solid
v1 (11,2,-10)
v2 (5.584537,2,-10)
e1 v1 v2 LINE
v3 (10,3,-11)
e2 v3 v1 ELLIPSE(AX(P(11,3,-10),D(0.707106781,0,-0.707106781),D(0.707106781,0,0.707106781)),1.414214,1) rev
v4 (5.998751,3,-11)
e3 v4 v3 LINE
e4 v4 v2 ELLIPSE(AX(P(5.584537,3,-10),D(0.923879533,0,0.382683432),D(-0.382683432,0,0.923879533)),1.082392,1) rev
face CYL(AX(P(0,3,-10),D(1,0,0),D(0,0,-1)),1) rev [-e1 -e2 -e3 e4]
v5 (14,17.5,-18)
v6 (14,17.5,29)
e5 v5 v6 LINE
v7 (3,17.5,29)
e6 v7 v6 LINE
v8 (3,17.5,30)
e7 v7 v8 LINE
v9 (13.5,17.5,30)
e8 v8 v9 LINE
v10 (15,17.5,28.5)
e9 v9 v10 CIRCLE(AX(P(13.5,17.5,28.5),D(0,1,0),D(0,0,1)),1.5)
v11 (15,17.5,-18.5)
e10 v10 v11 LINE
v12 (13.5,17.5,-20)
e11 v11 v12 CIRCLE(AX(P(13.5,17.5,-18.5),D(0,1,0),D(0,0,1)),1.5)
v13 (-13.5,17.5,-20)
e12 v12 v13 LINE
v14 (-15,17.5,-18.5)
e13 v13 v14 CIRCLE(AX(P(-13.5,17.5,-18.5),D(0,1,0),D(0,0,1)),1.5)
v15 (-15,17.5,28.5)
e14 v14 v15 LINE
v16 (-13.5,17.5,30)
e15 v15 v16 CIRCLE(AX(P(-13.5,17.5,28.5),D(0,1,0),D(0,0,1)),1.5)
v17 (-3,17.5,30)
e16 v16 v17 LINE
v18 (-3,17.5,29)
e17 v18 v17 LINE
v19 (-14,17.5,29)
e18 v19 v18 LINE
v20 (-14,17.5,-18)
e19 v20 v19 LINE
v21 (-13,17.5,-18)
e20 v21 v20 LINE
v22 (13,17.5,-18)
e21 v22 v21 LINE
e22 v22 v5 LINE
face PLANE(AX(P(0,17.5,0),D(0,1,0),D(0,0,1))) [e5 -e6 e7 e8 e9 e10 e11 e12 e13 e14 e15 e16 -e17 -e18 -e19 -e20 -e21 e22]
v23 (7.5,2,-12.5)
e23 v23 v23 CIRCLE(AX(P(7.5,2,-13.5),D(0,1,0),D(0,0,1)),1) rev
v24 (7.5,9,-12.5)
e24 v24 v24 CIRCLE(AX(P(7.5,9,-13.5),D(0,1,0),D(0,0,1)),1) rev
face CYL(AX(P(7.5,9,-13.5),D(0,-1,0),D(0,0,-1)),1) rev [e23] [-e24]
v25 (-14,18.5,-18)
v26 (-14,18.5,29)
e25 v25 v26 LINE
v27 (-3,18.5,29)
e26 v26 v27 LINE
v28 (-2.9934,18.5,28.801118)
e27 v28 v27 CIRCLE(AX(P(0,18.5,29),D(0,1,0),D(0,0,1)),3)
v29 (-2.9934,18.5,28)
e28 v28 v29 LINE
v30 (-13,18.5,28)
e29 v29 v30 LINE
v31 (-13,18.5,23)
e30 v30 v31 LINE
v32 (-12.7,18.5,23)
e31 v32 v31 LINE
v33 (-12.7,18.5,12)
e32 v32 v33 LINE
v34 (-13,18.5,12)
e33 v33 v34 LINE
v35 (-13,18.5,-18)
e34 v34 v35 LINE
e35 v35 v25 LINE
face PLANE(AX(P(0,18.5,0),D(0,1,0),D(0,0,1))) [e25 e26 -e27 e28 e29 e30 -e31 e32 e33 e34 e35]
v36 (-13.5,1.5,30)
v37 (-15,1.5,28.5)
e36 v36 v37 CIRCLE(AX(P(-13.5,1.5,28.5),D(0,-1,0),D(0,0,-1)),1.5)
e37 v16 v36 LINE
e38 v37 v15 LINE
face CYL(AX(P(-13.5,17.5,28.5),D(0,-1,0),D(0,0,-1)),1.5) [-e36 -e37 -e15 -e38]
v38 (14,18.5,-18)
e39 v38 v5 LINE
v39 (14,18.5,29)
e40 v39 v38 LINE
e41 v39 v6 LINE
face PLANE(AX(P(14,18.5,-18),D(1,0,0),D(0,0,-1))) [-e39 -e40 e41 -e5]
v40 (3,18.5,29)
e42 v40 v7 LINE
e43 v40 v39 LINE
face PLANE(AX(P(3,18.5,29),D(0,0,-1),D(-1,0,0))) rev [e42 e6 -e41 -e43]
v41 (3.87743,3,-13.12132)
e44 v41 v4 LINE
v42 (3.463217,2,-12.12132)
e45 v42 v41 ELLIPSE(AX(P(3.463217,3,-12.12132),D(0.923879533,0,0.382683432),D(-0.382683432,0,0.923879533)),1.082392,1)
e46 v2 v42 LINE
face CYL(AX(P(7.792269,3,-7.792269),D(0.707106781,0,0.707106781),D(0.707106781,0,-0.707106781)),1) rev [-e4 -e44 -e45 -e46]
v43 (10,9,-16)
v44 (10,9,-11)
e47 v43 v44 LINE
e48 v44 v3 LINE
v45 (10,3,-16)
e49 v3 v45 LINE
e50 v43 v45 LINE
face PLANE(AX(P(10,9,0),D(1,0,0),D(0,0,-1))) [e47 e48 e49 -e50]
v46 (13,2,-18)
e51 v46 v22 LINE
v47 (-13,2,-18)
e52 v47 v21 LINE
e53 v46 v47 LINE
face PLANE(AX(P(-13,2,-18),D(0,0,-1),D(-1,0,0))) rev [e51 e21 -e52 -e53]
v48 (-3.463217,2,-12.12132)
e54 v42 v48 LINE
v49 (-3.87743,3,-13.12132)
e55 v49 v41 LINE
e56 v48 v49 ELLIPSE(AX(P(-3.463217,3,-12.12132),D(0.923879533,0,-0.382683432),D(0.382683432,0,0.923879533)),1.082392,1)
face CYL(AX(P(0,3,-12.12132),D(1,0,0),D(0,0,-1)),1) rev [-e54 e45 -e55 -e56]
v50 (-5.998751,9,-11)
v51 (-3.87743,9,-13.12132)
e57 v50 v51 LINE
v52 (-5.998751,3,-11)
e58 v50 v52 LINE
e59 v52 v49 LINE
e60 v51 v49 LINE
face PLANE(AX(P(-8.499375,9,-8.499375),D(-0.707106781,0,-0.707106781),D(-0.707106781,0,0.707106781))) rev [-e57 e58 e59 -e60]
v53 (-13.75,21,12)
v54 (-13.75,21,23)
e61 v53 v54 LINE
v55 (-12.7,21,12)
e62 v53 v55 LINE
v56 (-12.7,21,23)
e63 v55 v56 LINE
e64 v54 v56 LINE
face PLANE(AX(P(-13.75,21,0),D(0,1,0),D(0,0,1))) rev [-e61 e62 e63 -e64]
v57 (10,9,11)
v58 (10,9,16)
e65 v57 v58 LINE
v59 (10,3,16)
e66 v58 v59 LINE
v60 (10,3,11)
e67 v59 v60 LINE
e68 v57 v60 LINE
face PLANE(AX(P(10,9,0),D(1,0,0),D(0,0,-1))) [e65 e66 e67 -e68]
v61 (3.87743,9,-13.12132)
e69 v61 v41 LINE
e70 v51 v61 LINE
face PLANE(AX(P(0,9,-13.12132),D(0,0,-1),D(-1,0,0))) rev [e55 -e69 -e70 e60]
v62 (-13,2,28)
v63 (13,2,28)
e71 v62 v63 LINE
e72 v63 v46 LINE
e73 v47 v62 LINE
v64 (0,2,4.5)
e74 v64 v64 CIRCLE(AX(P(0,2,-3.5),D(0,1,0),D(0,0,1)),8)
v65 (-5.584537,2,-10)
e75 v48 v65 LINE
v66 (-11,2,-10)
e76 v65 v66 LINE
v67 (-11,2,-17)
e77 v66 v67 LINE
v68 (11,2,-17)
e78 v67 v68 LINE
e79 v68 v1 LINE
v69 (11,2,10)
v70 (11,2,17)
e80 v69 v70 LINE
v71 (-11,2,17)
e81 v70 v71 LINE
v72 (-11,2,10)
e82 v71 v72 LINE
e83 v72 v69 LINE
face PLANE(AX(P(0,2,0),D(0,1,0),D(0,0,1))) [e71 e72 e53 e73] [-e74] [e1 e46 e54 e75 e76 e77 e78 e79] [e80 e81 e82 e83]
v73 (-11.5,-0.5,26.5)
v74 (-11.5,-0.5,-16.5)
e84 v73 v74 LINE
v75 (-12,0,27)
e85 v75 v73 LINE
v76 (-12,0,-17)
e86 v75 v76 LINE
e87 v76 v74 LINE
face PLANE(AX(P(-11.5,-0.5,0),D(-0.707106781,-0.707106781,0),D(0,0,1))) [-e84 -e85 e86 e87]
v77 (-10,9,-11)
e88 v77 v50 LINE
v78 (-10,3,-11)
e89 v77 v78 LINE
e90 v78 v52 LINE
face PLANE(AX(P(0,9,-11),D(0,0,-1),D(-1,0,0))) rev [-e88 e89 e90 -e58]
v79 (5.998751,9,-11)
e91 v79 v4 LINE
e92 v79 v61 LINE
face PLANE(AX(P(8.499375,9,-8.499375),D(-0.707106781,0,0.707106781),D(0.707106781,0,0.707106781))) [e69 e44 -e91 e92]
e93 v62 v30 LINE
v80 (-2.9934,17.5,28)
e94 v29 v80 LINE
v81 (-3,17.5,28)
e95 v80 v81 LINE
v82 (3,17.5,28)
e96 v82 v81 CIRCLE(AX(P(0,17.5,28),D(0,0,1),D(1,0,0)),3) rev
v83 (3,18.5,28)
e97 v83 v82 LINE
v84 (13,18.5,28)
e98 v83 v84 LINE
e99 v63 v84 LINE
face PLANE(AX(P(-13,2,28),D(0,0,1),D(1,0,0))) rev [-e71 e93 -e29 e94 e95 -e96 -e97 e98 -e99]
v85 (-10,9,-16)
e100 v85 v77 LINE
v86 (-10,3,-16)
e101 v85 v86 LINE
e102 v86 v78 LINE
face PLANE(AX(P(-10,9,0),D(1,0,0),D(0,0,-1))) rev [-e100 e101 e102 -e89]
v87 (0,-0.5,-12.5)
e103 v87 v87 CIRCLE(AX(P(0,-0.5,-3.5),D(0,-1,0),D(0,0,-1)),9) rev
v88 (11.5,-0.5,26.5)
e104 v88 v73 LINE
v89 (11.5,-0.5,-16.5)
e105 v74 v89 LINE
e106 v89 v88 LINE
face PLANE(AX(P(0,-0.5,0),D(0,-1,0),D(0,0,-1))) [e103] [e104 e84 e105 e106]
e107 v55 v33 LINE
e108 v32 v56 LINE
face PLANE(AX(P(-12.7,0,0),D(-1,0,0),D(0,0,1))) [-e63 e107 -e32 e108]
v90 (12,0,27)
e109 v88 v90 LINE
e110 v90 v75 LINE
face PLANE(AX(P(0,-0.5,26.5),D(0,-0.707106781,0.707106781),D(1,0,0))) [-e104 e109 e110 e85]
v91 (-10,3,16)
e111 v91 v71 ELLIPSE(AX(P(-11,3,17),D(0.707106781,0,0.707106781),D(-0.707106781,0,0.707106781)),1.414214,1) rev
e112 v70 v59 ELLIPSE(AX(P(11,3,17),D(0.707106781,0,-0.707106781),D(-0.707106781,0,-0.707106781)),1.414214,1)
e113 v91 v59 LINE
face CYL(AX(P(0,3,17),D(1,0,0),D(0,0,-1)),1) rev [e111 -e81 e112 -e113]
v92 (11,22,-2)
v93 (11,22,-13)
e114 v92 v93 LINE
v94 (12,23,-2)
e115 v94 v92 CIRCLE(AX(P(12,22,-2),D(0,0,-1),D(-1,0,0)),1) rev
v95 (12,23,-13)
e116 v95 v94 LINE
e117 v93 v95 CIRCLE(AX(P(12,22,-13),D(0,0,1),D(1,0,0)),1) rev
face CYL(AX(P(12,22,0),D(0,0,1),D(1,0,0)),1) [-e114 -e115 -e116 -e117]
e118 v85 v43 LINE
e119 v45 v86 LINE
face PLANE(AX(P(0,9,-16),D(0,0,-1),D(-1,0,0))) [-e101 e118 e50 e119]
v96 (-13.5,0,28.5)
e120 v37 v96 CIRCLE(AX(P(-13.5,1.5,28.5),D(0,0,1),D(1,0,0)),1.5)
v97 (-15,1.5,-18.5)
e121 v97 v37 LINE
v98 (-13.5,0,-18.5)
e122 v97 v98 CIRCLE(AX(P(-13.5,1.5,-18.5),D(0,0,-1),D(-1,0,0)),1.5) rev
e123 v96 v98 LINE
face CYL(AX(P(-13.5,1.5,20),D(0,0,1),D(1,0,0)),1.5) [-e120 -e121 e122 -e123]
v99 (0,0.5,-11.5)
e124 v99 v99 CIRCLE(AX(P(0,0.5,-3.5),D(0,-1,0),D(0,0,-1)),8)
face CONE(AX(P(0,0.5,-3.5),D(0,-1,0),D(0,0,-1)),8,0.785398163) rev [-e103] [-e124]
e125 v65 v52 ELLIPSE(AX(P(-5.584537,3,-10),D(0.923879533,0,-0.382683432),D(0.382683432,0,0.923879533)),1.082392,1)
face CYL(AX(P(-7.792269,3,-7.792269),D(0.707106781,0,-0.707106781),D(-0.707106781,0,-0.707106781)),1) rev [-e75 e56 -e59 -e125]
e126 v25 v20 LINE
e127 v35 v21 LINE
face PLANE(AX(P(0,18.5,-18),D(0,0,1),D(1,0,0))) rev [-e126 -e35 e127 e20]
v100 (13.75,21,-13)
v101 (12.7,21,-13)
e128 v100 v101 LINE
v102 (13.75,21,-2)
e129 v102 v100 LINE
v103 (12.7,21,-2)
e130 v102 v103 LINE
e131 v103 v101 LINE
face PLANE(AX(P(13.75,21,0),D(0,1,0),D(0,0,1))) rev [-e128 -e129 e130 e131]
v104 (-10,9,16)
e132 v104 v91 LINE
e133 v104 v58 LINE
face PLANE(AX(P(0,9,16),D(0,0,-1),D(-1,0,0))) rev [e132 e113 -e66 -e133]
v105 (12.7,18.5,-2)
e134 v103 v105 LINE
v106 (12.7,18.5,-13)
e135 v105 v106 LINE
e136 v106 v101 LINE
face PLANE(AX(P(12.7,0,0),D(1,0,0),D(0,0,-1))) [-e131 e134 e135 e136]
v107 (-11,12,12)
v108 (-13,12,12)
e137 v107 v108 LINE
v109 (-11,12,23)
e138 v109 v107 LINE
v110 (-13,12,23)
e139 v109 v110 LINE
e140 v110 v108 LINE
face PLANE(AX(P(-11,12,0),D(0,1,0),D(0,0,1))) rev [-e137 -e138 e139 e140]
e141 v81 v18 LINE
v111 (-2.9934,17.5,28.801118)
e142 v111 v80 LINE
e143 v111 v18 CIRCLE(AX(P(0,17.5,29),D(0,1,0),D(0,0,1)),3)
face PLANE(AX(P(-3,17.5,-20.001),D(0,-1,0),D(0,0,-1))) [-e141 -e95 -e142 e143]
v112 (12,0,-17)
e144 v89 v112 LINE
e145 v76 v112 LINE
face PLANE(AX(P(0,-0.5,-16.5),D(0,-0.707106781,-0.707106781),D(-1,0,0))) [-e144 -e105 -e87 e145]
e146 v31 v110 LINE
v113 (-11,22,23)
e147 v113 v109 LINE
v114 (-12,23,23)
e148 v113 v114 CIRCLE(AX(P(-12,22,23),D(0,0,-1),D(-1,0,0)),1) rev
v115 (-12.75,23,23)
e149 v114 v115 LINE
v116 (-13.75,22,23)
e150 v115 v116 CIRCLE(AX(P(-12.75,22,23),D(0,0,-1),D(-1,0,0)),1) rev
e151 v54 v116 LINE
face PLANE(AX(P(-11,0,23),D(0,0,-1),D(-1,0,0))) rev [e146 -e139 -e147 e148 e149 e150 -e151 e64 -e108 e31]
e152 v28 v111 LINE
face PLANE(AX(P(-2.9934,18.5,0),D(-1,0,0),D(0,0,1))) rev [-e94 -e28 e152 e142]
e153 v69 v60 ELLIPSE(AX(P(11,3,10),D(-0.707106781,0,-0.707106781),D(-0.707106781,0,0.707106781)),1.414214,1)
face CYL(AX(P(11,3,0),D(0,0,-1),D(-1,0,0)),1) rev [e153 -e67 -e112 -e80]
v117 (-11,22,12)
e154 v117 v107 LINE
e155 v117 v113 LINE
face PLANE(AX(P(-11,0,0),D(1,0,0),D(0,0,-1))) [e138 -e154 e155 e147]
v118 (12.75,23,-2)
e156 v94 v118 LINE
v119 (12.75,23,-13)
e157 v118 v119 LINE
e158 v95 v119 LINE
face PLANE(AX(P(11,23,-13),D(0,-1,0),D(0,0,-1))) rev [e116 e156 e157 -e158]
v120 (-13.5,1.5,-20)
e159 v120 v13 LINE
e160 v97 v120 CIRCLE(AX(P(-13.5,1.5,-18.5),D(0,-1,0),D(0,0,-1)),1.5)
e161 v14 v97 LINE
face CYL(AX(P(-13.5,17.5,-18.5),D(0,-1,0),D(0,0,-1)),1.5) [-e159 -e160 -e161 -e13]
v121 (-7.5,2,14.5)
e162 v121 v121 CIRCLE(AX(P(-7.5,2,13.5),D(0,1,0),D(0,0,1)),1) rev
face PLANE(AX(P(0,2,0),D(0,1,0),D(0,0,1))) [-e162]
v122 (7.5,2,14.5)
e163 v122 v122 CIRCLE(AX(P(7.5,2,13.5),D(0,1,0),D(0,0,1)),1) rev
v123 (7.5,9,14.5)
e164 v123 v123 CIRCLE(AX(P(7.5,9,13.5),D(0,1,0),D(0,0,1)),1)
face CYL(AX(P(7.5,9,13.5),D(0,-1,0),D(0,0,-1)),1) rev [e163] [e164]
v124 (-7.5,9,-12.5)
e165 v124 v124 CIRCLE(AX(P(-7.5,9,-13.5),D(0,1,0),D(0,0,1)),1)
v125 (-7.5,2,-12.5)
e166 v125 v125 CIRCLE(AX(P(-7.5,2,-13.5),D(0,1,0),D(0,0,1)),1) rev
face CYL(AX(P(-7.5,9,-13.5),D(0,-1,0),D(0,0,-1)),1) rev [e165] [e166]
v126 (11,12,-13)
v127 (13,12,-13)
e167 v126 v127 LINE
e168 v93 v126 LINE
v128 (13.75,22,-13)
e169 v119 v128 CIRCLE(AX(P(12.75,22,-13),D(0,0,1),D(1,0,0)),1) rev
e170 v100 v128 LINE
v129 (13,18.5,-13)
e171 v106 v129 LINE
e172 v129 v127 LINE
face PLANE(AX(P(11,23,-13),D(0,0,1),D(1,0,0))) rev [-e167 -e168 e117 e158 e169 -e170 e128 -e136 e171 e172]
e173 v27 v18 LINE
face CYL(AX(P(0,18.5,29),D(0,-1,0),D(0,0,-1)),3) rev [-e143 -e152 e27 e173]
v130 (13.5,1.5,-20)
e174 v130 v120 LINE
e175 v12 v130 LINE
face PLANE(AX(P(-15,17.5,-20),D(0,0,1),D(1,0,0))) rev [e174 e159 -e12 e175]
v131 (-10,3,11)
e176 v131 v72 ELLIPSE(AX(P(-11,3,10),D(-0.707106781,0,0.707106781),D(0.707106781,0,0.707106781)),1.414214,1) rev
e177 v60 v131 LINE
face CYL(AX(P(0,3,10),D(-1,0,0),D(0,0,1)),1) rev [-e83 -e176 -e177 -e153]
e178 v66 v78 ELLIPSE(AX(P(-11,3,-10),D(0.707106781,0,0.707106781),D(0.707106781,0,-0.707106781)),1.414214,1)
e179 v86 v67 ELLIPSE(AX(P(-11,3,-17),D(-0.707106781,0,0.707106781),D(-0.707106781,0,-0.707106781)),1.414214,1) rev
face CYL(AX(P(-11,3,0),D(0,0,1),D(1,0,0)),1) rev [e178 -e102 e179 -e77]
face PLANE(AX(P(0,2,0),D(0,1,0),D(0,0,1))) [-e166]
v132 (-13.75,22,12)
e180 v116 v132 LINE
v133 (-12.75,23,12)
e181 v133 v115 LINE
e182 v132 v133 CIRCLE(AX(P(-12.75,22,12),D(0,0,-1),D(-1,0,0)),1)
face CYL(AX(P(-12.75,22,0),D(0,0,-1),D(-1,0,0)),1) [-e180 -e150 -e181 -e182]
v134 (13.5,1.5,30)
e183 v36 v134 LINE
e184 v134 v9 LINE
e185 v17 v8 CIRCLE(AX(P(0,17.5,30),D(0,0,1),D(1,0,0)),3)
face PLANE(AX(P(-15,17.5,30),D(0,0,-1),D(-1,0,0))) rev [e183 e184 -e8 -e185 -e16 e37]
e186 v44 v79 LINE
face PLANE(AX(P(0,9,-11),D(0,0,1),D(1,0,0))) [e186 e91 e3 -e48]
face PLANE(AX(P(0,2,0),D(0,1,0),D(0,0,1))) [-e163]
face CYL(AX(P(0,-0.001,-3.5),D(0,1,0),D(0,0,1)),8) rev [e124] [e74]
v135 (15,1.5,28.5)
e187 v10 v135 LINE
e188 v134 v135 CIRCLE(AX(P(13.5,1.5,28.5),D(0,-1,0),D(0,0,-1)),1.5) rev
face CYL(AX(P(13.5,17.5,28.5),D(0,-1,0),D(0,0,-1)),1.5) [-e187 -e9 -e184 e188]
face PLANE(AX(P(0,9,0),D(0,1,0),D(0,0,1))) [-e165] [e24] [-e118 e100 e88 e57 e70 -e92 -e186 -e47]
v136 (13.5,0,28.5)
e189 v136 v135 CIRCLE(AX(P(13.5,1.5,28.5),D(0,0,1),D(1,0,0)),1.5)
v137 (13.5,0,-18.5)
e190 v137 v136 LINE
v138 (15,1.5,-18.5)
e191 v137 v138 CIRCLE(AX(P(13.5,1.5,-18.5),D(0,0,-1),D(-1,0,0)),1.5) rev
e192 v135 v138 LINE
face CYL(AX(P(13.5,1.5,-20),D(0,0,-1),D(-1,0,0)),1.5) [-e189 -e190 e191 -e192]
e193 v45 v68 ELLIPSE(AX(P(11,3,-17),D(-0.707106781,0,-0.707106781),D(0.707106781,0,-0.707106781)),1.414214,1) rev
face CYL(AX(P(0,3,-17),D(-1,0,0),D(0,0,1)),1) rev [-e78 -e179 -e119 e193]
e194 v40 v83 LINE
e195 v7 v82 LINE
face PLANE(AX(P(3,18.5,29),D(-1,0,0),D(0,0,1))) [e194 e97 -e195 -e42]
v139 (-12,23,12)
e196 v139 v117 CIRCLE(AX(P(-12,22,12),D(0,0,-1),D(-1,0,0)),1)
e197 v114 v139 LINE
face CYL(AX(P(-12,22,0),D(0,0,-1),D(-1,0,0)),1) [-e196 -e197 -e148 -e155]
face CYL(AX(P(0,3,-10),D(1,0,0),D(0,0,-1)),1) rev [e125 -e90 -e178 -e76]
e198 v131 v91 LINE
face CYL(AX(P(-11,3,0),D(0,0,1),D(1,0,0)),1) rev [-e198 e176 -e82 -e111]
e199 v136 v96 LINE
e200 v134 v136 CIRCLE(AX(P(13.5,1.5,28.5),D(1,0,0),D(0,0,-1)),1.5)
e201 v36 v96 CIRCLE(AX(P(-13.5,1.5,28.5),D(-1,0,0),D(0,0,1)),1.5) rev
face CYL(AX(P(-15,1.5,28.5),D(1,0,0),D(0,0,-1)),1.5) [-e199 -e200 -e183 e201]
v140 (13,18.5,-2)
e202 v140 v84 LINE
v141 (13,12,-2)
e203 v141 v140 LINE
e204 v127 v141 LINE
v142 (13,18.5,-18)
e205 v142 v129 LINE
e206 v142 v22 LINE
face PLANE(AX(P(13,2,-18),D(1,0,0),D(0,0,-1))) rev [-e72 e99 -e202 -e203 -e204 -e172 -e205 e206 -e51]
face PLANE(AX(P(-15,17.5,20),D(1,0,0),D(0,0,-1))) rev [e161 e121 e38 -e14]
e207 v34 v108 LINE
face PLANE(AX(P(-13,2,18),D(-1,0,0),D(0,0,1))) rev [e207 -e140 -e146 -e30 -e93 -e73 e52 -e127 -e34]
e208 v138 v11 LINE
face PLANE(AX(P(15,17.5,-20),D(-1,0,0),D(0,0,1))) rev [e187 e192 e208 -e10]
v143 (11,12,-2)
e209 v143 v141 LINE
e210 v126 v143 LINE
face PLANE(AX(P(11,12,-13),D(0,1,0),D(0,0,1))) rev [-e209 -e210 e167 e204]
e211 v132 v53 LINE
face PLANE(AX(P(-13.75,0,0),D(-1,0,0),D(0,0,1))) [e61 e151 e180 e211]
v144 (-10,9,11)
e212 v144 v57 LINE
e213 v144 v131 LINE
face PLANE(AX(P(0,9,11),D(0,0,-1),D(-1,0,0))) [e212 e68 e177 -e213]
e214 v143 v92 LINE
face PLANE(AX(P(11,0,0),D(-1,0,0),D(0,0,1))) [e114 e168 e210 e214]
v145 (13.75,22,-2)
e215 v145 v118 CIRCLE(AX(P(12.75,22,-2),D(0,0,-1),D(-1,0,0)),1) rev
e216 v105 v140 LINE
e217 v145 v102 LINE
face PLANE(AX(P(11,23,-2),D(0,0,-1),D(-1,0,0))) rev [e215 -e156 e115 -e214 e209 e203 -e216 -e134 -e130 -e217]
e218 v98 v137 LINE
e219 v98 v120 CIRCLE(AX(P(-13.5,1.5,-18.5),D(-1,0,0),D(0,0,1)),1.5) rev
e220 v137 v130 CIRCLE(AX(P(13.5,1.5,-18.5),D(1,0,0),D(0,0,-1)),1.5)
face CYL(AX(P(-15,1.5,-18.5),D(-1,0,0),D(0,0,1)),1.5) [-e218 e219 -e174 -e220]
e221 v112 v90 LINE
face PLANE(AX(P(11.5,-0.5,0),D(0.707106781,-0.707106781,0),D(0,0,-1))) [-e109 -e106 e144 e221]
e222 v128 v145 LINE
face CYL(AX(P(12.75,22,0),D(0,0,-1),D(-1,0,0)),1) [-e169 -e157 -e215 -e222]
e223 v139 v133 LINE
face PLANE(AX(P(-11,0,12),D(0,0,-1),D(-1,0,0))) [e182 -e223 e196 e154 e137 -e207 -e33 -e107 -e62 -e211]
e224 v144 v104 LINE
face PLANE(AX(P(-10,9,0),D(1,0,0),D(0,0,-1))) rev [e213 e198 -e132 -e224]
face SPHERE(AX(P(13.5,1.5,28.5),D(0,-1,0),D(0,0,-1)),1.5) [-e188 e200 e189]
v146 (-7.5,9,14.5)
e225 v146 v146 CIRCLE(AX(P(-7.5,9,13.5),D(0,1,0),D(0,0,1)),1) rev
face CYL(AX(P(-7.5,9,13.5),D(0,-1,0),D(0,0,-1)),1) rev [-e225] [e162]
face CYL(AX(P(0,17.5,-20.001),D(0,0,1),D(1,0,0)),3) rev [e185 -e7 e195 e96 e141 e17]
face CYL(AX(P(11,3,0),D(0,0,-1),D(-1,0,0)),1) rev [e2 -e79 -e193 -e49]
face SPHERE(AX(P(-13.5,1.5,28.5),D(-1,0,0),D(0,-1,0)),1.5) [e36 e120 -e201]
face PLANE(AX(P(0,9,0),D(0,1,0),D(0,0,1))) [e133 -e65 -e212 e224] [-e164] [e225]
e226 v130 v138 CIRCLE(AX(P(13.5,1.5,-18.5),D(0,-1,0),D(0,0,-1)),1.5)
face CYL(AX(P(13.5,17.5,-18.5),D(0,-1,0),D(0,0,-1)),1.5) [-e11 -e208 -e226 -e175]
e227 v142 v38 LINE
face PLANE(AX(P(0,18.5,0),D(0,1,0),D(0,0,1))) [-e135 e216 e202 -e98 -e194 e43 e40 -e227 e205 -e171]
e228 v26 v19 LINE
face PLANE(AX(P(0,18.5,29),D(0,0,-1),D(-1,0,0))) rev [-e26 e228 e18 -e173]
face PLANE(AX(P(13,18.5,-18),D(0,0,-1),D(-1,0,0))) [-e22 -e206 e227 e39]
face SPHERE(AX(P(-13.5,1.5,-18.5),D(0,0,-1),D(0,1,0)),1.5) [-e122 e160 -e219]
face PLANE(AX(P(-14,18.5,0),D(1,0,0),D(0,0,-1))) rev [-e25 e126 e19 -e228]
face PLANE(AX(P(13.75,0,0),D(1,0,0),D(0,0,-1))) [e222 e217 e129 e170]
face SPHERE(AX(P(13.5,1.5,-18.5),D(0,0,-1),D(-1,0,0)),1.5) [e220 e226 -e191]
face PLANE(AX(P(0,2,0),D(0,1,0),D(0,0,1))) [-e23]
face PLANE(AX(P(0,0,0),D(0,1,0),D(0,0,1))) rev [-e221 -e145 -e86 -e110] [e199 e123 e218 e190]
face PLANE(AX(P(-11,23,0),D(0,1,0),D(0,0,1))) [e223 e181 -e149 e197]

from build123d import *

# Parameters (mm, degrees)
BOSS_EXTRUDE1_DEPTH  = 17.5
CUT_EXTRUDE1_DEPTH   = 15.5
CUT_EXTRUDE3_REACH   = 38.949
SKETCH4_R            = 8
SKETCH4_4_R          = 1
SKETCH4_4_W          = 20
SKETCH4_4_H          = 5
BOSS_EXTRUDE2_DEPTH  = 7
FILLET1_R            = 1
FILLET2_R            = 1.5
BOSS_EXTRUDE3_DEPTH  = 2
SKETCH6_W            = 11
SKETCH6_H            = 2
BOSS_EXTRUDE4_DEPTH  = 0.75
SKETCH11_R           = 8
BOSS_EXTRUDE11_DEPTH = 0.5
SKETCH14_W           = 11
SKETCH14_H           = 11
BOSS_EXTRUDE12_DEPTH = 2
BOSS_EXTRUDE13_DEPTH = 1
SKETCH6_4_W          = 11
SKETCH6_4_H          = 2.5
CUT_EXTRUDE6_DEPTH   = 0.3
SKETCH16_W           = 11
SKETCH16_H           = 2
BOSS_EXTRUDE14_DEPTH = 0.75
SKETCH16_3_W         = 11
SKETCH16_3_H         = 2.5
CUT_EXTRUDE7_DEPTH   = 0.3
CUT_EXTRUDE8_REACH   = 59.044
FILLET3_R            = 1
CHAMFER1_SIZE        = 0.5
CHAMFER3_SIZE        = 1


with BuildPart() as part:
    # Sketch1 → Boss-Extrude1 (new body)
    with BuildSketch(Plane(origin=(0, 0, 0), x_dir=(1, 0, 0), z_dir=(0, 1, 0))):
        Polygon((-15, 20), (15, 20), (15, -20), (15, -30), (-15, -30), (-15, -20), align=None)
    extrude(amount=BOSS_EXTRUDE1_DEPTH)

    # Sketch2 → Cut-Extrude1 (cut)
    with BuildSketch(Plane(origin=(0, 17.5, 0), x_dir=(1, 0, 0), z_dir=(0, 1, 0))):
        Polygon((-13, 18), (13, 18), (13, -18), (13, -28), (-13, -28), (-13, -18), align=None)
    extrude(amount=-CUT_EXTRUDE1_DEPTH, mode=Mode.SUBTRACT)

    # Sketch4 → Cut-Extrude3 (cut, up to next)
    with BuildSketch(Plane(origin=(0, 2, 0), x_dir=(1, 0, 0), z_dir=(0, 1, 0)), mode=Mode.PRIVATE) as cut_extrude3_sk1:
        with Locations(Location((0, 3.5, 0), (0, 0, 270))):
            Circle(SKETCH4_R)
    cut_extrude3_tool1 = extrude(cut_extrude3_sk1.sketch, amount=-CUT_EXTRUDE3_REACH, mode=Mode.PRIVATE) & part.part
    add(cut_extrude3_tool1.solids().sort_by_distance((0, 2, -3.5))[0], mode=Mode.SUBTRACT)

    # Sketch4<4> → Boss-Extrude2 (add)
    # profile 1 of 2: a face of its own
    with BuildSketch(Plane(origin=(0, 2, 0), x_dir=(1, 0, 0), z_dir=(0, 1, 0))):
        Polygon((10, 16), (-10, 16), (-10, 11), (-5.998750655, 11), (-3.877430311, 13.121320344), (3.877430311, 13.121320344), (5.998750655, 11), (10, 11), align=None)
        with Locations(Location((-7.5, 13.5, 0), (0, 0, 270))):
            Circle(SKETCH4_4_R, mode=Mode.SUBTRACT)
        with Locations(Location((7.5, 13.5, 0), (0, 0, 270))):
            Circle(SKETCH4_4_R, mode=Mode.SUBTRACT)
    # profile 2 of 2: a face of its own
    with BuildSketch(Plane(origin=(0, 2, 0), x_dir=(1, 0, 0), z_dir=(0, 1, 0))):
        with Locations((0, -13.5)):
            Rectangle(SKETCH4_4_W, SKETCH4_4_H)
        with Locations(Location((7.5, -13.5, 0), (0, 0, 270))):
            Circle(SKETCH4_4_R, mode=Mode.SUBTRACT)
        with Locations(Location((-7.5, -13.5, 0), (0, 0, 270))):
            Circle(SKETCH4_4_R, mode=Mode.SUBTRACT)
    extrude(amount=BOSS_EXTRUDE2_DEPTH)

    # Fillet1
    fillet1_edges = [part.edges().sort_by_distance(p)[0] for p in [
        (-4.938090483, 2, -12.060660172),
        (0, 2, -13.121320344),
        (-10, 2, -13.5),
        (-7.999375327, 2, -11),
        (0, 2, -16),
        (10, 2, -13.5),
        (7.999375327, 2, -11),
        (4.938090483, 2, -12.060660172),
        (-10, 2, 13.5),
        (0, 2, 16),
        (0, 2, 11),
        (10, 2, 13.5),
    ]]
    fillet(fillet1_edges, radius=FILLET1_R)

    # Fillet2
    fillet2_edges = [part.edges().sort_by_distance(p)[0] for p in [
        (15, 8.75, 30),
        (-15, 8.75, 30),
        (-15, 8.75, -20),
        (15, 8.75, -20),
        (0, 0, 30),
        (-15, 0, 5),
        (0, 0, -20),
        (15, 0, 5),
    ]]
    fillet(fillet2_edges, radius=FILLET2_R)

    # Sketch5 → Boss-Extrude3 (add)
    with BuildSketch(Plane(origin=(-13, 0, 0), x_dir=(0, 0, -1), z_dir=(1, 0, 0))):
        Polygon((-12, 17.5), (-18, 17.5), (-23, 17.5), (-23, 12), (-12, 12), align=None)
        Polygon((-23, 17.5), (-18, 17.5), (-12, 17.5), (-12, 23), (-23, 23), align=None)
    extrude(amount=BOSS_EXTRUDE3_DEPTH)

    # Sketch6 → Boss-Extrude4 (add)
    with BuildSketch(Plane.ZY.offset(13)):
        with Locations((17.5, 22)):
            Rectangle(SKETCH6_W, SKETCH6_H)
    extrude(amount=BOSS_EXTRUDE4_DEPTH)

    # Sketch11 → Boss-Extrude11 (add)
    with BuildSketch(Plane.XZ):
        Polygon((-12, 17), (-12, -17), (12, -17), (12, 17), (12, 27), (-12, 27), align=None)
        with Locations(Location((0, -3.5, 0), (0, 0, 90))):
            Circle(SKETCH11_R, mode=Mode.SUBTRACT)
    extrude(amount=BOSS_EXTRUDE11_DEPTH)

    # Sketch14 → Boss-Extrude12 (add)
    with BuildSketch(Plane.ZY.offset(-13)):
        with Locations((-7.5, 17.5)):
            Rectangle(SKETCH14_W, SKETCH14_H)
    extrude(amount=BOSS_EXTRUDE12_DEPTH)

    # Sketch15 → Boss-Extrude13 (add)
    with BuildSketch(Plane(origin=(0, 17.5, 0), x_dir=(1, 0, 0), z_dir=(0, 1, 0))):
        with BuildLine():
            Line((-13, -28), (-13, 18))
            Line((-13, 18), (-14, 18))
            Line((-14, 18), (-14, -29))
            Line((-14, -29), (-3, -29))
            ThreePointArc((-3, -29), (-2.998349642, -28.900504153), (-2.993400384, -28.801117774))
            Line((-2.993400384, -28.801117774), (-2.993400384, -28))
            Line((-2.993400384, -28), (-13, -28))
        make_face()
        Polygon((14, 18), (13, 18), (13, -28), (3, -28), (3, -29), (14, -29), align=None)
    extrude(amount=BOSS_EXTRUDE13_DEPTH)

    # Sketch6<4> → Cut-Extrude6 (cut)
    with BuildSketch(Plane.ZY.offset(13)):
        with Locations((17.5, 19.75)):
            Rectangle(SKETCH6_4_W, SKETCH6_4_H)
    extrude(amount=-CUT_EXTRUDE6_DEPTH, mode=Mode.SUBTRACT)

    # Sketch16 → Boss-Extrude14 (add)
    with BuildSketch(Plane(origin=(13, 0, 0), x_dir=(0, 0, -1), z_dir=(1, 0, 0))):
        with Locations((7.5, 22)):
            Rectangle(SKETCH16_W, SKETCH16_H)
    extrude(amount=BOSS_EXTRUDE14_DEPTH)

    # Sketch16<3> → Cut-Extrude7 (cut)
    with BuildSketch(Plane(origin=(13, 0, 0), x_dir=(0, 0, -1), z_dir=(1, 0, 0))):
        with Locations((7.5, 19.75)):
            Rectangle(SKETCH16_3_W, SKETCH16_3_H)
    extrude(amount=-CUT_EXTRUDE7_DEPTH, mode=Mode.SUBTRACT)

    # Sketch17 → Cut-Extrude8 (cut, up to next)
    with BuildSketch(Plane.XY.offset(30), mode=Mode.PRIVATE) as cut_extrude8_sk1:
        with BuildLine():
            Line((-3, 17.5), (3, 17.5))
            ThreePointArc((3, 17.5), (0, 14.5), (-3, 17.5))
        make_face()
    cut_extrude8_tool1 = extrude(cut_extrude8_sk1.sketch, amount=-CUT_EXTRUDE8_REACH, mode=Mode.PRIVATE) & part.part
    add(cut_extrude8_tool1.solids().sort_by_distance((0, 16.22676, 30))[0], mode=Mode.SUBTRACT)

    # Fillet3
    fillet3_edges = [part.edges().sort_by_distance(p)[0] for p in [
        (-11, 23, 17.5),
        (-13.75, 23, 17.5),
        (11, 23, -7.5),
        (13.75, 23, -7.5),
    ]]
    fillet(fillet3_edges, radius=FILLET3_R)

    # Chamfer1
    chamfer1_edges = [part.edges().sort_by_distance(p)[0] for p in [
        (0, -0.5, 27),
        (12, -0.5, 5),
        (-12, -0.5, 5),
        (0, -0.5, -17),
    ]]
    chamfer(chamfer1_edges, length=CHAMFER1_SIZE - 0.0001)  # a hair under: the kernel refuses the full size

    # Chamfer3
    chamfer3_edges = [part.edges().sort_by_distance(p)[0] for p in [
        (0, -0.5, -11.5),
    ]]
    chamfer(chamfer3_edges, length=CHAMFER3_SIZE)


solid = part.part
